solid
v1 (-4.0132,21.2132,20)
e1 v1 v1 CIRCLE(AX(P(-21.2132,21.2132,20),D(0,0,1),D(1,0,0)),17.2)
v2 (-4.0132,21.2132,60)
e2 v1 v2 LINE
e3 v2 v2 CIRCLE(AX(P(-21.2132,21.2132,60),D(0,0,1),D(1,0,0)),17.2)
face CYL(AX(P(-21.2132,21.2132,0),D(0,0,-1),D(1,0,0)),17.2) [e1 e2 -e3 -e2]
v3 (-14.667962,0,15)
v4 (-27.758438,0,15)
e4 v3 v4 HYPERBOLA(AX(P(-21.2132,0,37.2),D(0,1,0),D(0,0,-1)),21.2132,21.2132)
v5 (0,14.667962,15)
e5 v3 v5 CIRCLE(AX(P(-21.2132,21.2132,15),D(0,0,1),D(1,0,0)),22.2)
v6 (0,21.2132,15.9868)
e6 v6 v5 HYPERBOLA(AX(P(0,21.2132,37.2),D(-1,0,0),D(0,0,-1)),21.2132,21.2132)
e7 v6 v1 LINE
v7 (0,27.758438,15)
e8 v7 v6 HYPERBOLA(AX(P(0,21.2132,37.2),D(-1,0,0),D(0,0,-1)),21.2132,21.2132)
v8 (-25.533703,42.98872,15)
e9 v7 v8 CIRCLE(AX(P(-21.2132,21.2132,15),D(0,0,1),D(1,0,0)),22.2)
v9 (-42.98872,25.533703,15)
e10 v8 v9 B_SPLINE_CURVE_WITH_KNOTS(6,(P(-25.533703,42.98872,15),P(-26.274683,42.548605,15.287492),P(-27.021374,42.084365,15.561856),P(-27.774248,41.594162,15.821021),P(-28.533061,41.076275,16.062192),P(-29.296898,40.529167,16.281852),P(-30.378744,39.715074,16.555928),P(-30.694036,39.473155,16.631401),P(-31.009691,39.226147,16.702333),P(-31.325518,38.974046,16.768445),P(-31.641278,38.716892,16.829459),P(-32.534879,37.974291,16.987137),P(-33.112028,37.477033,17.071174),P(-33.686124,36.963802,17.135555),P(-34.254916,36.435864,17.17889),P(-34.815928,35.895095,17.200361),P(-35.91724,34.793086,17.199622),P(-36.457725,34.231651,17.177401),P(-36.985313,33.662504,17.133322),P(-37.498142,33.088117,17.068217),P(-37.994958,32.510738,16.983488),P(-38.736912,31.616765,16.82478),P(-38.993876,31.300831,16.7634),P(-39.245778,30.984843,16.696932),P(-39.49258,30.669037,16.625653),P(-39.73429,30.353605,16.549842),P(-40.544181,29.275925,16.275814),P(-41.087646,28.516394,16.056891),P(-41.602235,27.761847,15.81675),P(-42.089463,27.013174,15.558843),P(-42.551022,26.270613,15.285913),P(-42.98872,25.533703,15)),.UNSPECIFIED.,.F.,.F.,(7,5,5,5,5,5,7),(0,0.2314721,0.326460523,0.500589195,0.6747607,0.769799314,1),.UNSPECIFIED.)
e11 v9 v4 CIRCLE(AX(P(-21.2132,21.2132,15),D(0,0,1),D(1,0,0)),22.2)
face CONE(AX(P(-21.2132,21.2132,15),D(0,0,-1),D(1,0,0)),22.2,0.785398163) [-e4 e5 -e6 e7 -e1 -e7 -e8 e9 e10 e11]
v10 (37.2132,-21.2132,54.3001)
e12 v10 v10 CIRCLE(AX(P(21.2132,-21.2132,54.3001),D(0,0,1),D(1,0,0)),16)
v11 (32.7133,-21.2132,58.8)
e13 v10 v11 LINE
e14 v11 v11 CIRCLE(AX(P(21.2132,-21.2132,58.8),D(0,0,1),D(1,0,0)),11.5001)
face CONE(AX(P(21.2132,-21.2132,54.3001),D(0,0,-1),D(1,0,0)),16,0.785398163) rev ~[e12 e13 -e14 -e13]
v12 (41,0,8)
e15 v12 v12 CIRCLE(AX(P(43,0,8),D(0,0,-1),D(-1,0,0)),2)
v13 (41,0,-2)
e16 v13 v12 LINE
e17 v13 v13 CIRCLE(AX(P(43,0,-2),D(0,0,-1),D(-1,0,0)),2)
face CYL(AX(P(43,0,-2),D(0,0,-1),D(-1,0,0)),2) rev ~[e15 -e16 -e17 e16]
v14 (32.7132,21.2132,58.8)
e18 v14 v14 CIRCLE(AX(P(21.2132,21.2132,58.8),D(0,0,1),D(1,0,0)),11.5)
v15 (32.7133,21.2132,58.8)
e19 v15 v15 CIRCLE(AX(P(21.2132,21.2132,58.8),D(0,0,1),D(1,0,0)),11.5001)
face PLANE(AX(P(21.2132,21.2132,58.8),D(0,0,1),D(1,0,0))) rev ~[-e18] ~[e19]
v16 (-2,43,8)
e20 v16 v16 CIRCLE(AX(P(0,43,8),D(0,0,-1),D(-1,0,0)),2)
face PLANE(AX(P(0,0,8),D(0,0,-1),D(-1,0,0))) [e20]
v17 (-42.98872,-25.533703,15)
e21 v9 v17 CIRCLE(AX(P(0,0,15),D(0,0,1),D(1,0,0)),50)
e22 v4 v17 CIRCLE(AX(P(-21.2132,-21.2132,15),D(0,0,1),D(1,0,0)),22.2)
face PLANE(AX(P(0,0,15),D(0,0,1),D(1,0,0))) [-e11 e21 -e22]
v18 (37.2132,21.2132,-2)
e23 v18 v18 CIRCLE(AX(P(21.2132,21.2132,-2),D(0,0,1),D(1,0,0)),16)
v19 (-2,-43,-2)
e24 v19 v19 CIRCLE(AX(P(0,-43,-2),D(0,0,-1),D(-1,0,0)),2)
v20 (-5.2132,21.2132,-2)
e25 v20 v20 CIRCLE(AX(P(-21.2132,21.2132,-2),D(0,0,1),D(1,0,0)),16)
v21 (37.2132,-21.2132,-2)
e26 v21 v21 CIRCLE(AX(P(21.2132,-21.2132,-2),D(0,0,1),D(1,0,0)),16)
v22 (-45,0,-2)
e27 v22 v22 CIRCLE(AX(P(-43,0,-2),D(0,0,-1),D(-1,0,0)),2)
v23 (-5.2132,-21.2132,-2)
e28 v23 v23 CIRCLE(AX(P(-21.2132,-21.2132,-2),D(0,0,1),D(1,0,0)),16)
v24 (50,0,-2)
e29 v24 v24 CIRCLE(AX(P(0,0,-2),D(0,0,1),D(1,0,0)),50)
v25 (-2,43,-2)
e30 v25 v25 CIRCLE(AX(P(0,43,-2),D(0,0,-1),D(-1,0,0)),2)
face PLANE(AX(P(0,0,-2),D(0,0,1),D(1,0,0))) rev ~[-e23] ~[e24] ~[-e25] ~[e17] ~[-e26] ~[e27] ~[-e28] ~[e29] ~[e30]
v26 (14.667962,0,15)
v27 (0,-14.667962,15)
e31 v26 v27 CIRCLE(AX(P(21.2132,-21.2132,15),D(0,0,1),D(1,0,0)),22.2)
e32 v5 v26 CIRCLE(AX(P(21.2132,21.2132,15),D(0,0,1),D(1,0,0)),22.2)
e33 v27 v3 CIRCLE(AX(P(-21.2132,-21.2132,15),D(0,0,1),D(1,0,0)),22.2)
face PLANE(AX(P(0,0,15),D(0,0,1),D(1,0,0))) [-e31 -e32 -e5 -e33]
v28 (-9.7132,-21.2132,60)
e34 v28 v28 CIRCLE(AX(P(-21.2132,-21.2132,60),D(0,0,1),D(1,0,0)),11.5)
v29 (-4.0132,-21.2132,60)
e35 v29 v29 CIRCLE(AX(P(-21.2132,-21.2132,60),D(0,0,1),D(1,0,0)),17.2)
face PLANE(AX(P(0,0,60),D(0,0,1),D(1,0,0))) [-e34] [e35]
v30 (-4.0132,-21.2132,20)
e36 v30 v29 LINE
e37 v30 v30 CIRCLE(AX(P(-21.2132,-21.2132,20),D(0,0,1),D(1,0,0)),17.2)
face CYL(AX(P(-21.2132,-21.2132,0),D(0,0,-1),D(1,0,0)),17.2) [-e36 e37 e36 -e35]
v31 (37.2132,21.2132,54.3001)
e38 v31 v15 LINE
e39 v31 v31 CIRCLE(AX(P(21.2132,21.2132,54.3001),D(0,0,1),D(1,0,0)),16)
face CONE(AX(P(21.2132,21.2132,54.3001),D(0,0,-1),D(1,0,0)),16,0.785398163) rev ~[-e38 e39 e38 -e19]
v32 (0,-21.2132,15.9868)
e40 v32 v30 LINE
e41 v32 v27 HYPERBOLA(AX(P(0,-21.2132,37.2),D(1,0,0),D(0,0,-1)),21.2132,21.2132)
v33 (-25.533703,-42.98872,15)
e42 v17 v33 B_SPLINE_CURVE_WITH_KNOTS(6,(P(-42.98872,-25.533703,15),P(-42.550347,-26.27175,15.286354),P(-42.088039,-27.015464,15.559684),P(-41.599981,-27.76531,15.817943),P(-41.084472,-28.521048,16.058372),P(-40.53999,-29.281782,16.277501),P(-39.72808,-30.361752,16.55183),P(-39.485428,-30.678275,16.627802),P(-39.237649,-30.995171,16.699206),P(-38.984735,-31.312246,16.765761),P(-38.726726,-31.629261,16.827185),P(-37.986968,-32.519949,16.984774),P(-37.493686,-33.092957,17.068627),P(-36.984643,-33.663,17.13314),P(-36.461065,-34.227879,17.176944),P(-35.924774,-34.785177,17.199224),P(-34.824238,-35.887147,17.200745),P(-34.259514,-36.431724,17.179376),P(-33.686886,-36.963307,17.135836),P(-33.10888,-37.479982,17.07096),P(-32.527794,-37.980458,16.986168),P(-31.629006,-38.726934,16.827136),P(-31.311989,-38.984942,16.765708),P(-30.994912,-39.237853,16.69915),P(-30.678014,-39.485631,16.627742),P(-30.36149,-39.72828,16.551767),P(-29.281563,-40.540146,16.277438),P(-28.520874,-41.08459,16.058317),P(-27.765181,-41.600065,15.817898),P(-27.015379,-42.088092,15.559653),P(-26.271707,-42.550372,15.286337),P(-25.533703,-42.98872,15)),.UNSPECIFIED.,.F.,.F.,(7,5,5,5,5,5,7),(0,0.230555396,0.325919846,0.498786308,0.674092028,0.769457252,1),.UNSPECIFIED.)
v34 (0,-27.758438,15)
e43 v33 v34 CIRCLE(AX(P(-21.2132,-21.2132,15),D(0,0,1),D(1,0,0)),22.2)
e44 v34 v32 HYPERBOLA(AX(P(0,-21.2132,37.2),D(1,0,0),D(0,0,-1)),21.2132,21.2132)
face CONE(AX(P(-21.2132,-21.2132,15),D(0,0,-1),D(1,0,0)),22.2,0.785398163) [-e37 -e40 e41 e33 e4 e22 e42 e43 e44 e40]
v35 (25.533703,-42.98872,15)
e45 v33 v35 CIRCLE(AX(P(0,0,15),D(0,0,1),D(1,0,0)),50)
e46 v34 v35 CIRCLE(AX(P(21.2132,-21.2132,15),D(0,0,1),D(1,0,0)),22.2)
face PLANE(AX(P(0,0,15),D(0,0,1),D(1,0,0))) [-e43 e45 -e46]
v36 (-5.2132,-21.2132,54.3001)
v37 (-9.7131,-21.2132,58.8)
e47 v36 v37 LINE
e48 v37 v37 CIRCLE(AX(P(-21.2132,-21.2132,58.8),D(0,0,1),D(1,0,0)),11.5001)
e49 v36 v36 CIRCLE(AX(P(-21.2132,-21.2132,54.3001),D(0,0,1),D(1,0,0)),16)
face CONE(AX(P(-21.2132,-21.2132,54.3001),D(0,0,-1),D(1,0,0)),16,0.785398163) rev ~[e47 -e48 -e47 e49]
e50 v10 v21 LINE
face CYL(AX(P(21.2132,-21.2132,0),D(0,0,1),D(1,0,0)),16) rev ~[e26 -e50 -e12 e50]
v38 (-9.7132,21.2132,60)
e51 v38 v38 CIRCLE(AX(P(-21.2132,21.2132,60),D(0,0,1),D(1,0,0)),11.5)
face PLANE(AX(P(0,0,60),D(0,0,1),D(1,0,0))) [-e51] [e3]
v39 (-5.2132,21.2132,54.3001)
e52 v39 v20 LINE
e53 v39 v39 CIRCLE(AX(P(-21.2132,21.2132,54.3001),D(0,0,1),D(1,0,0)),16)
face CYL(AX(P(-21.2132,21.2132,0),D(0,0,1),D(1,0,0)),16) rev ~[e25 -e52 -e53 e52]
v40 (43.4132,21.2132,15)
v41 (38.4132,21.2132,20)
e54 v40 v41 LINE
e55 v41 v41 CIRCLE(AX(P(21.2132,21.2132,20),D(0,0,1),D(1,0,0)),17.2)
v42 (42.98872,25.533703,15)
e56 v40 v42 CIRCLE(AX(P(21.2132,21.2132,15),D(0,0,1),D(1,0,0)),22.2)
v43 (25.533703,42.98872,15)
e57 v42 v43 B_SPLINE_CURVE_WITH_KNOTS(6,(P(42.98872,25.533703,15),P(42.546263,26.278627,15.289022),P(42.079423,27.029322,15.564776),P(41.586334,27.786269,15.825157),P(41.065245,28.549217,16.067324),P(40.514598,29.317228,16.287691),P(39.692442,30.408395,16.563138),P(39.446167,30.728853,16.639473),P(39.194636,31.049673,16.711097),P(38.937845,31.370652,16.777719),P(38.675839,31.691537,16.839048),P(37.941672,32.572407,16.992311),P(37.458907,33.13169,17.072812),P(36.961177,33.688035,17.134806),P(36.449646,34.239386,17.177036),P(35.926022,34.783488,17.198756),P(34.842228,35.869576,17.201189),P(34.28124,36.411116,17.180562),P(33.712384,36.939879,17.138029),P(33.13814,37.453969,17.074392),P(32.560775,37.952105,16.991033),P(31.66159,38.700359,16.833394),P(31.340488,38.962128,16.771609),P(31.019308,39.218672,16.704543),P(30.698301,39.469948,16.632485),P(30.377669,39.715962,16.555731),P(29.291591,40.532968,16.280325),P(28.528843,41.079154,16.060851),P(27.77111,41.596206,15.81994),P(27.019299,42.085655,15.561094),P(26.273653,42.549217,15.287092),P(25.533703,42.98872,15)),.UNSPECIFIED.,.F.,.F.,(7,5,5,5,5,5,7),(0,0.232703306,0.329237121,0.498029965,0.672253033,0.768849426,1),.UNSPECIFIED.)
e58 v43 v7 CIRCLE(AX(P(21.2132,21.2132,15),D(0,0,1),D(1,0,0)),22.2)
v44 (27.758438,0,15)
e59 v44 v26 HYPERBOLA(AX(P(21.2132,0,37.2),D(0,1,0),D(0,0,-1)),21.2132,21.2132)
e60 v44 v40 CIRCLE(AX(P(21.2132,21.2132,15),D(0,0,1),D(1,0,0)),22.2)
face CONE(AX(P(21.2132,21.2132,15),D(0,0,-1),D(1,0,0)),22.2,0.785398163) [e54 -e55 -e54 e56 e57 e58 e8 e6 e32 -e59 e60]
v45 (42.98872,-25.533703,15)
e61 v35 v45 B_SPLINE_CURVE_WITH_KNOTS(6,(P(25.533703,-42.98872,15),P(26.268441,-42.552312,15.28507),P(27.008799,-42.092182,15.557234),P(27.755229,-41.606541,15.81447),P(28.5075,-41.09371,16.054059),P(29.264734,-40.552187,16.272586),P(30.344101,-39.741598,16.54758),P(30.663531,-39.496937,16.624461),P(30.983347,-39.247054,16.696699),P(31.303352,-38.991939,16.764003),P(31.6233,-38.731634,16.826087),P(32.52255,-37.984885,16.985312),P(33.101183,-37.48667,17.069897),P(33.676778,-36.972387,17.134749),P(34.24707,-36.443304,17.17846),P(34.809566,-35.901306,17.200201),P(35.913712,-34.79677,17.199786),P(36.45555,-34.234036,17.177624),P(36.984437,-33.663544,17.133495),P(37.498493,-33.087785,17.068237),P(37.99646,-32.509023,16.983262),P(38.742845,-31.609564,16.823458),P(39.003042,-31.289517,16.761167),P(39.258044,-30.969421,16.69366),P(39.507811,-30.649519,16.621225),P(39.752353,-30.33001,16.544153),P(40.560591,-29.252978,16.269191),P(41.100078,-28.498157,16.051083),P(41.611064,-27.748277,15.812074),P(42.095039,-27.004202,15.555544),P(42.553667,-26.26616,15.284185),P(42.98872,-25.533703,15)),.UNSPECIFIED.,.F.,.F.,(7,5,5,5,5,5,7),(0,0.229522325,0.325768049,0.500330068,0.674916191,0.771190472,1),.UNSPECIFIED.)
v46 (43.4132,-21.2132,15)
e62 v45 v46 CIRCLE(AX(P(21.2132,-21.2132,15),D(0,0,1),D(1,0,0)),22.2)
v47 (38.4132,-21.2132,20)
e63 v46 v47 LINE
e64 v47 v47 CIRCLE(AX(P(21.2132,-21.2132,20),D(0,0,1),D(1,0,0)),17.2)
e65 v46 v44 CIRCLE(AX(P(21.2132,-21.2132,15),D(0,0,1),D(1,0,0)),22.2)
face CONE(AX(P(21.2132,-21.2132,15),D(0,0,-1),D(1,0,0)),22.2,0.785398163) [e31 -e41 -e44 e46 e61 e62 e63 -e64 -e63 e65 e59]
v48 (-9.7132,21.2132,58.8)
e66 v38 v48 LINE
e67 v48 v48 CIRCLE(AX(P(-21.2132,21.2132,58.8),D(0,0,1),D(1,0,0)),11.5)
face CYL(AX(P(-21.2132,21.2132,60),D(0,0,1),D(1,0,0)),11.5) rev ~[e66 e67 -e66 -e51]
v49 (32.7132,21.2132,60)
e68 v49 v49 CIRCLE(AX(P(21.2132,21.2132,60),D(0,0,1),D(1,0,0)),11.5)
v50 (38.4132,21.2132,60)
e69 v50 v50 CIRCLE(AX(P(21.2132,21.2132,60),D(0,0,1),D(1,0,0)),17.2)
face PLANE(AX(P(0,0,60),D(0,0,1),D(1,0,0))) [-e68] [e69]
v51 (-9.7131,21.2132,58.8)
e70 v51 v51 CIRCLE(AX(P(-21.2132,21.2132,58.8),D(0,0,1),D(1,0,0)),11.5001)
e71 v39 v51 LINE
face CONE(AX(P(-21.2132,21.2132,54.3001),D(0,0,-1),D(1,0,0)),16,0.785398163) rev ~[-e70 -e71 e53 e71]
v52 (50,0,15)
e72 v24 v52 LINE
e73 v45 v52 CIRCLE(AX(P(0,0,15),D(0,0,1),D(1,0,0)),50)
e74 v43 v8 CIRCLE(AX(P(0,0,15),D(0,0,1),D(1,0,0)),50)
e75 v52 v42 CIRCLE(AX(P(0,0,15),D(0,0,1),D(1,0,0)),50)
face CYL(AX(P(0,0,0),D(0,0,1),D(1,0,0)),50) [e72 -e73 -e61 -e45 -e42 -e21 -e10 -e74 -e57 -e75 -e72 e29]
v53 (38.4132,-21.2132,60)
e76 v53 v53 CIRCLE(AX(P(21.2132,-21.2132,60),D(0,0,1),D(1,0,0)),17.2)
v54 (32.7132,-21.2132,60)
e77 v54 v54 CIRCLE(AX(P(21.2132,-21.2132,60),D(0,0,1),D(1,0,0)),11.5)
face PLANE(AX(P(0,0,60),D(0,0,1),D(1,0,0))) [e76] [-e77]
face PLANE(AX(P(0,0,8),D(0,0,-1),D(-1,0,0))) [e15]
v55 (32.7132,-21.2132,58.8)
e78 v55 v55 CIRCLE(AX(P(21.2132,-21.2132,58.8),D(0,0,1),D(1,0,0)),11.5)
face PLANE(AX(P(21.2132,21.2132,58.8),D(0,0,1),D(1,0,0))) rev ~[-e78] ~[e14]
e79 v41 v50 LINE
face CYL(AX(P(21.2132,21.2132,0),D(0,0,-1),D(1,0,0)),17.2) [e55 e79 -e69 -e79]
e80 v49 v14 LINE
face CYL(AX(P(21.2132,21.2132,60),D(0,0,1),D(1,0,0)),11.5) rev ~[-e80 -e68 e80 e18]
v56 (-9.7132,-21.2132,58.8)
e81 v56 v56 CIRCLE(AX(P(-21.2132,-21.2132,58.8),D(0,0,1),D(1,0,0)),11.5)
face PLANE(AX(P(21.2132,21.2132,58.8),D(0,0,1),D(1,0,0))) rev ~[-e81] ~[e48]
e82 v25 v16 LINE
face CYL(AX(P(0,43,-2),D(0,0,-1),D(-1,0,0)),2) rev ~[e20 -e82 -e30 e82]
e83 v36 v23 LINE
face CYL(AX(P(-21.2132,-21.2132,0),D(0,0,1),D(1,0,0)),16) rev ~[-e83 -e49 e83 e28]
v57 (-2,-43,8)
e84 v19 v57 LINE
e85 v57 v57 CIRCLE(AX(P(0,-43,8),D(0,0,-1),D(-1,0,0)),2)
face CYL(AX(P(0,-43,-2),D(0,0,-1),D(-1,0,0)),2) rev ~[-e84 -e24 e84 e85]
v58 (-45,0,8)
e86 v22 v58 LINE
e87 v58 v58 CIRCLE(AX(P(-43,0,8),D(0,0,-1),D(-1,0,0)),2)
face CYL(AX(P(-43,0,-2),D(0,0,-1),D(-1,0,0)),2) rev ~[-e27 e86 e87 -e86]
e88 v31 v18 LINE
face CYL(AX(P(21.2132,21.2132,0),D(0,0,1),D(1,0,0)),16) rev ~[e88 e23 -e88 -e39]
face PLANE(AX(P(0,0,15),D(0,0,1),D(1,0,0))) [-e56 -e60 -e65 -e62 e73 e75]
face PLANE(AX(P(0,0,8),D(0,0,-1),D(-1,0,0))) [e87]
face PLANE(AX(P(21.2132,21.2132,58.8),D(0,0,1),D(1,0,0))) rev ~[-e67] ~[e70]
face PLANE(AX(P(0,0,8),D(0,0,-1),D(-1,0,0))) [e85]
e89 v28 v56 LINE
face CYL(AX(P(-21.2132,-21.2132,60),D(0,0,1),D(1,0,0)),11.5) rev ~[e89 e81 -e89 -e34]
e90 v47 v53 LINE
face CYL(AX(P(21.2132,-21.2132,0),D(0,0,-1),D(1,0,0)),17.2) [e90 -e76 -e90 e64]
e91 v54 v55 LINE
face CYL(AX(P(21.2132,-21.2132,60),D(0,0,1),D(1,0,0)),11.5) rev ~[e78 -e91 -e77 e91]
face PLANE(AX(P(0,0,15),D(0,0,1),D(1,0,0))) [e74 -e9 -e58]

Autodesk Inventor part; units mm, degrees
ref_plane "YZ Plane" through (0, 0, 0) normal (1, 0, 0) x (0, 1, 0)
ref_plane "XZ Plane" through (0, 0, 0) normal (0, 1, 0) x (-1, 0, 0)
ref_plane "XY Plane" through (0, 0, 0) normal (0, 0, 1) x (1, 0, 0)
sketch "Sketch1" plane through (0, 0, 0) normal (0, 0, 1) x (1, 0, 0)
  circle A0 centre (0, 0) radius 50
  circle A1 centre (21.2132, 21.2132) radius 16
  circle A2 centre (21.2132, 21.2132) radius 17.2
  line L0 (0, 0) -> (50, 0) construction
  line L1 (0, 0) -> (35.3553, 35.3553) construction
  circle A3 centre (-21.2132, 21.2132) radius 16
  circle A4 centre (-21.2132, 21.2132) radius 17.2
  circle A5 centre (-21.2132, -21.2132) radius 16
  circle A6 centre (-21.2132, -21.2132) radius 17.2
  circle A7 centre (21.2132, -21.2132) radius 16
  circle A8 centre (21.2132, -21.2132) radius 17.2
  dimension "d0" = 32
  dimension "d2" = 100
  dimension "d3" = 1.2
  dimension "d5" = 45
  dimension "d6" = 30
  dimension "d9" = 360
extrude "Extrusion1" add sketch "Sketch1" against normal blind 2 contours A0 | A2 | A4 | A6 | A8
extrude "Extrusion2" add sketch "Sketch1" along normal blind 60 contours A2 | A4 | A6 | A8
sketch "Sketch2" plane through (21.2132, 21.2132, 60) normal (0, 0, 1) x (1, 0, 0)
  circle A0 centre (-42.4264, 0) radius 16 projected
  circle A1 centre (0, 0) radius 16 projected
  circle A2 centre (0, -42.4264) radius 16 projected
  circle A3 centre (-42.4264, -42.4264) radius 16 projected
  circle A4 centre (0, 0) radius 11.5
  circle A5 centre (-42.4264, 0) radius 11.5
  circle A6 centre (-42.4264, -42.4264) radius 11.5
  circle A7 centre (0, -42.4264) radius 11.5
  point P0 (-21.2132, -21.2132)
  dimension "d15" = 23
extrude "Extrusion3" add sketch "Sketch2" against normal blind 1.2
chamfer "Chamfer1" distance 4.5 angle 45 4 edges at (5.2132, 21.2132, 58.8) (-37.2132, 21.2132, 58.8) (-37.2132, -21.2132, 58.8) (5.2132, -21.2132, 58.8)
sketch "Sketch4" plane through (0, 0, 0) normal (0, 0, 1) x (1, 0, 0)
  circle A0 centre (21.2132, 21.2132) radius 17.2 projected
  circle A1 centre (-21.2132, -21.2132) radius 17.2 projected
  circle A2 centre (21.2132, -21.2132) radius 17.2 projected
  circle A3 centre (-21.2132, 21.2132) radius 17.2 projected
  circle A4 centre (0, 0) radius 50 projected
  circle A5 centre (0, -43) radius 2 projected
extrude "Extrusion5" add sketch "Sketch4" along normal blind 15 contours A4 | A5
chamfer "Chamfer3" distance 5 angle 45 4 edges at (-38.4132, 21.2132, 15) (4.0132, 21.2132, 15) (4.0132, -21.2132, 15) (-38.4132, -21.2132, 15)
sketch "Sketch5" plane through (0, 0, -2) normal (0, 0, -1) x (-1, 0, 0)
  circle A0 centre (0, 43) radius 2
  circle A1 centre (-43, 0) radius 2
  circle A2 centre (0, -43) radius 2
  circle A3 centre (43, 0) radius 2
  point P0 (0, 0)
  dimension "d39" = 4
  dimension "d40" = 43
  dimension "d43" = 360
extrude "Extrusion6" cut sketch "Sketch5" against normal blind 10
properties part number "Cam Barrel Plate" material "ABS Plastic"
